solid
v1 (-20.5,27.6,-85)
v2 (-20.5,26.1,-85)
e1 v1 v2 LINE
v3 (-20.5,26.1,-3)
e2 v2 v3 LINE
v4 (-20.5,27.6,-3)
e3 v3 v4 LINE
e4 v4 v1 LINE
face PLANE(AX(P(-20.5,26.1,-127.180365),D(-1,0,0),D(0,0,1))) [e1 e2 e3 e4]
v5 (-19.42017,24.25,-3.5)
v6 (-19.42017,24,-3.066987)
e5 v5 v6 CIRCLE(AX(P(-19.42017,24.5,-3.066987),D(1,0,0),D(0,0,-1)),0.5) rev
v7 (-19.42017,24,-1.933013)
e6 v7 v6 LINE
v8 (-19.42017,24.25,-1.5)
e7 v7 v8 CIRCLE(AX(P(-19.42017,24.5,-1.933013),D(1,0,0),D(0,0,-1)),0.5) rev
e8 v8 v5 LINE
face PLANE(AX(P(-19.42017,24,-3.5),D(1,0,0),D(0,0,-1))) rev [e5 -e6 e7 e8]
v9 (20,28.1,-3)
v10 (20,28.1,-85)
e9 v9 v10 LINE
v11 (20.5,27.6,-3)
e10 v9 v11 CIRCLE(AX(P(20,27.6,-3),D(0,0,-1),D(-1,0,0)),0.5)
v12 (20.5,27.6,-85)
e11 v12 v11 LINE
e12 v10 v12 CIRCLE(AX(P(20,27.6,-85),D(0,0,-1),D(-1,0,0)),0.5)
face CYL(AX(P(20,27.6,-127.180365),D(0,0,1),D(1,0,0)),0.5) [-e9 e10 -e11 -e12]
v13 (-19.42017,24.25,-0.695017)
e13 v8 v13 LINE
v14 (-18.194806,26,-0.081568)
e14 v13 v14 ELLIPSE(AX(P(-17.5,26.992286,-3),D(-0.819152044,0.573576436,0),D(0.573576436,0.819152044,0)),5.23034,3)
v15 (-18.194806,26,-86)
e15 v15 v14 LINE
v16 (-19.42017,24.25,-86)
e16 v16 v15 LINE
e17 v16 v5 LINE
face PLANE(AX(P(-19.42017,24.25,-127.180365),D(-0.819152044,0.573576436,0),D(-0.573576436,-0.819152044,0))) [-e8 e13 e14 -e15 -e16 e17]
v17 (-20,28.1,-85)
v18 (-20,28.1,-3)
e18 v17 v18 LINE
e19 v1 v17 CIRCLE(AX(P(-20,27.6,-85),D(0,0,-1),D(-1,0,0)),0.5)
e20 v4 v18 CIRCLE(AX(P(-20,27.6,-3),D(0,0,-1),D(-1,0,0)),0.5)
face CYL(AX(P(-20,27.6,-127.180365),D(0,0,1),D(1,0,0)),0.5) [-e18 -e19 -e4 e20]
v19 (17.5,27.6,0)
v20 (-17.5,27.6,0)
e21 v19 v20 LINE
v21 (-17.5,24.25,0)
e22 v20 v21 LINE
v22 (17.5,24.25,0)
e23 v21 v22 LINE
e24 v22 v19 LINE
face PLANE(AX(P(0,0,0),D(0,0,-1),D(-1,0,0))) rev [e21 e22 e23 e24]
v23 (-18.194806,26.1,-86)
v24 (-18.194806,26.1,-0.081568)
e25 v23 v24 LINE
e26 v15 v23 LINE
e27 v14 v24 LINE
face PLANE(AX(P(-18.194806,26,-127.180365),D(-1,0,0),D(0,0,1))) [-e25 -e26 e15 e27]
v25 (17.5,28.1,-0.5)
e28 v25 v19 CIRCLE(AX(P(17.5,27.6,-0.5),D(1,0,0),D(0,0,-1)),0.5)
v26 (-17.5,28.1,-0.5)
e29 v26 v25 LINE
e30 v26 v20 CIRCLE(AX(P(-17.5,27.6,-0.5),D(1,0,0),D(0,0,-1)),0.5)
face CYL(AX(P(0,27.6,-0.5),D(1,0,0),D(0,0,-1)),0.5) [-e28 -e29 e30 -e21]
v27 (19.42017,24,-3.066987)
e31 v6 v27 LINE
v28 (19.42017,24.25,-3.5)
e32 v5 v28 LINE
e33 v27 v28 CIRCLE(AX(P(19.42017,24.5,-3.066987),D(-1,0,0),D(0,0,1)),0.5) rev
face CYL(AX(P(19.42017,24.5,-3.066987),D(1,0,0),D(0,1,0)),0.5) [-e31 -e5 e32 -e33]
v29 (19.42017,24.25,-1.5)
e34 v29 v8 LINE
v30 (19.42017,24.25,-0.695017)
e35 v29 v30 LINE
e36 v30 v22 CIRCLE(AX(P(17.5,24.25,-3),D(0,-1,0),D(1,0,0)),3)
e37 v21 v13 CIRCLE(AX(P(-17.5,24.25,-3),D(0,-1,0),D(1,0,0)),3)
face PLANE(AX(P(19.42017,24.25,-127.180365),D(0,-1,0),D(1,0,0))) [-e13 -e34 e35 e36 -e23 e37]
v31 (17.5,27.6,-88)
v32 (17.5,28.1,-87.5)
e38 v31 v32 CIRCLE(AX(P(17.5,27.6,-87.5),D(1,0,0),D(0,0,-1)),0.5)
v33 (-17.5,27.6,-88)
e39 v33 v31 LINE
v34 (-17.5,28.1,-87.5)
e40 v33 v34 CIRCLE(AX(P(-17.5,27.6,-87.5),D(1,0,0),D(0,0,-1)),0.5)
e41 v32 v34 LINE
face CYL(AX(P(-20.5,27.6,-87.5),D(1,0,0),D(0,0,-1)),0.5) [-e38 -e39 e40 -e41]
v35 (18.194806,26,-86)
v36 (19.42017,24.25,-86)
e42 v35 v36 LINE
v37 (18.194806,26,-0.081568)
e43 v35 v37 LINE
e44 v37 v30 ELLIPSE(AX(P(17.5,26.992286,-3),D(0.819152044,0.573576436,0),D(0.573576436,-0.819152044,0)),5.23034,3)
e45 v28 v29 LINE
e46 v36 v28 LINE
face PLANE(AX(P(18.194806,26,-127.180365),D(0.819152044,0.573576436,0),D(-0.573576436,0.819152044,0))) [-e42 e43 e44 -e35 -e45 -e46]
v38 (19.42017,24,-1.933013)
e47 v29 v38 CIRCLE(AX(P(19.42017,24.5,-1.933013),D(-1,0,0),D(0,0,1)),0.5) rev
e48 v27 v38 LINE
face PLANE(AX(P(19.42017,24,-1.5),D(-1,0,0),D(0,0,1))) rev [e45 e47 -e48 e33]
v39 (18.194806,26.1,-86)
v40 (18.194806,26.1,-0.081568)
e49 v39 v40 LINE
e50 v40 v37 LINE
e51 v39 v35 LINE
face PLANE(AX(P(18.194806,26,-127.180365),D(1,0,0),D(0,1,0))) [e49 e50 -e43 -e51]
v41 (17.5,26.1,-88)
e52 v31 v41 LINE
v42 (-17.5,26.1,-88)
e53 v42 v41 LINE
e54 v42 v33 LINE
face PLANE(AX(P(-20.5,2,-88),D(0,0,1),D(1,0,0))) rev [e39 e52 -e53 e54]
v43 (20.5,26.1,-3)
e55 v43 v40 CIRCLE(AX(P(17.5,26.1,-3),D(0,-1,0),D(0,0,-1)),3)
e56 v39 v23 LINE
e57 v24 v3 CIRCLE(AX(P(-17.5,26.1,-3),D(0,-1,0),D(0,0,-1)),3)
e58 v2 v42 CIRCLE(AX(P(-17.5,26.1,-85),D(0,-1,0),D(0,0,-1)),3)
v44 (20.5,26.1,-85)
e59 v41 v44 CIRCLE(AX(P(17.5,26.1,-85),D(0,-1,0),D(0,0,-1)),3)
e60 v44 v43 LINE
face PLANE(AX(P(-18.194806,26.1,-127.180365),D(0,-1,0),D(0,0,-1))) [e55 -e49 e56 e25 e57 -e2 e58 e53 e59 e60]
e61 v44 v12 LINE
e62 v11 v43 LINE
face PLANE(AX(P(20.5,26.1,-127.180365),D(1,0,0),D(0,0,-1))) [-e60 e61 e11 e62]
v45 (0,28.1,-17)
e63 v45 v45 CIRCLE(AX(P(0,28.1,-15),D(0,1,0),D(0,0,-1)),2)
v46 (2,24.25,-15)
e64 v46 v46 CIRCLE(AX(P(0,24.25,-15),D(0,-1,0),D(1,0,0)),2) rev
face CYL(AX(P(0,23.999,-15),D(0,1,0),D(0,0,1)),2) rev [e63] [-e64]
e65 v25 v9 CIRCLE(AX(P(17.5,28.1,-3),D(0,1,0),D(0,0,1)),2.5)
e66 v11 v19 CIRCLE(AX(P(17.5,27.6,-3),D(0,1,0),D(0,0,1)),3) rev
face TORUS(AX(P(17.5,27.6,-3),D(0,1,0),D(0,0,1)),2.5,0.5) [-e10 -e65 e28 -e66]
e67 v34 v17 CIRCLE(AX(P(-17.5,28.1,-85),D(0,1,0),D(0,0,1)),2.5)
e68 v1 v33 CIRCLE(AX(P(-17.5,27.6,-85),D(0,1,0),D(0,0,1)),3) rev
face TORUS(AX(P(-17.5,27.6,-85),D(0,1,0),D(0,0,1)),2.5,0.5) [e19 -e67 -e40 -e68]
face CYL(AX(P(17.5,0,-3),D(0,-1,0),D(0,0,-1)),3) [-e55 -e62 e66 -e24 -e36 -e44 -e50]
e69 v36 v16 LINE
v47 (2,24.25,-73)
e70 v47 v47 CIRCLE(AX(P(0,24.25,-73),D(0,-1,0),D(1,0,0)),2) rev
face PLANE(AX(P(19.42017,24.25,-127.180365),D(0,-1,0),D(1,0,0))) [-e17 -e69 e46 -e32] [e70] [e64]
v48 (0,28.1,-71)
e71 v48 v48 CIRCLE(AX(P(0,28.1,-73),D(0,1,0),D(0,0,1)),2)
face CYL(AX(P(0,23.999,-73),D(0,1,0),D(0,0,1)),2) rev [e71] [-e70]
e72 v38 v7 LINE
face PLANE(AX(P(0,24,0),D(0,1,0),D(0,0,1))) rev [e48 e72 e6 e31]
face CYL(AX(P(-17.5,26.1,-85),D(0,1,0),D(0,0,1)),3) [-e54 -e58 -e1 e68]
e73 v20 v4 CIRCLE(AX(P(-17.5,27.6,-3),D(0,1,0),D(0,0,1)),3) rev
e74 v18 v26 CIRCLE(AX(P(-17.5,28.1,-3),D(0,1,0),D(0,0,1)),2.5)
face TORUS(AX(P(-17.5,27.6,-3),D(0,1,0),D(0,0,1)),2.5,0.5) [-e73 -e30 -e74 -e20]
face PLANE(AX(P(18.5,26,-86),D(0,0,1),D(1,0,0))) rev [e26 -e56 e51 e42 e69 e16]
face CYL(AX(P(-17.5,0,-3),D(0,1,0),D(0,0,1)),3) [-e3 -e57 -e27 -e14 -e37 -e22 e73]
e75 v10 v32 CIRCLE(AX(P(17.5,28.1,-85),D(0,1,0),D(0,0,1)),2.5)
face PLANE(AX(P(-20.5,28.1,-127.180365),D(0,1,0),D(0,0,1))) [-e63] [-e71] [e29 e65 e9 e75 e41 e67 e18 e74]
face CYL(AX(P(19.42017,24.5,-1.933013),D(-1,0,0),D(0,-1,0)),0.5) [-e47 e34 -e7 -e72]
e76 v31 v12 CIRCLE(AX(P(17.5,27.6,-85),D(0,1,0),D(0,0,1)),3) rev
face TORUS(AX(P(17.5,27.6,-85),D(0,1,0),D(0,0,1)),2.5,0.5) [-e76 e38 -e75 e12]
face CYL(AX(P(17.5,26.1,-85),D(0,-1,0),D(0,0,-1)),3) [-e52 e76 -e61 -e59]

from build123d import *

# Parameters (mm, degrees)
BOSS_EXTRUDE1_DEPTH = 86
SKETCH2_W           = 41
SKETCH2_H           = 2
BOSS_EXTRUDE2_DEPTH = 2
SKETCH3_W           = 38.84033909
SKETCH3_H           = 2
BOSS_EXTRUDE3_DEPTH = 0.25
FILLET2_R           = 0.5
FILLET1_R           = 3
CUT_EXTRUDE1_REACH  = 92.449
SKETCH4_R           = 2
FILLET3_R           = 0.5


with BuildPart() as part:
    # Sketch1 → Boss-Extrude1 (new body)
    with BuildSketch(Plane.XY):
        Polygon((18.194806353, 26), (19.420169545, 24.25), (-19.420169545, 24.25), (-18.194806353, 26), (-18.194806353, 26.1), (-20.5, 26.1), (-20.5, 28.1), (20.5, 28.1), (20.5, 26.1), (18.194806353, 26.1), align=None)
    extrude(amount=-BOSS_EXTRUDE1_DEPTH)

    # Sketch2 → Boss-Extrude2 (add)
    with BuildSketch(Plane(origin=(0, 0, -86), x_dir=(-1, 0, 0), z_dir=(0, 0, -1))):
        with Locations((0, 27.1)):
            Rectangle(SKETCH2_W, SKETCH2_H)
    extrude(amount=BOSS_EXTRUDE2_DEPTH)

    # Sketch3 → Boss-Extrude3 (add)
    with BuildSketch(Plane.XZ.offset(-24.25)):
        with Locations((0, -2.5)):
            Rectangle(SKETCH3_W, SKETCH3_H)
    extrude(amount=BOSS_EXTRUDE3_DEPTH)

    # Fillet2
    # the kernel refuses this fillet: 0.5 mm, written as the material it takes off along each edge
    with BuildSketch(Plane(origin=(-20.502701299, 24, -3.5), x_dir=(0, 1, 0), z_dir=(1, 0, 0)), Plane(origin=(20.502701299, 24, -1.5), x_dir=(0, 1, 0), z_dir=(-1, 0, 0))) as fillet2_piece_1:
        with BuildLine():
            CenterArc((0.5, 0.433012702), FILLET2_R, 180, 60)
            Line((0, 0.433012702), (-0.01, 0.433012702))
            Line((-0.01, 0.433012702), (-0.01, 0))
            Line((-0.01, 0), (0, -0.01))
            ThreePointArc((0, -0.01), (0.125, -0.01), (0.245, -0.008660254))
            Line((0.245, -0.008660254), (0.25, 0))
        make_face()
    extrude(amount=41.005402599, mode=Mode.SUBTRACT)

    # Fillet1
    fillet1_edges = [part.edges().sort_by_distance(p)[0] for p in [
        (-20.5, 27.1, 0),
        (20.5, 27.1, 0),
        (-20.5, 27.1, -88),
        (20.5, 27.1, -88),
    ]]
    fillet(fillet1_edges, radius=FILLET1_R)

    # Sketch4 → Cut-Extrude1 (cut, up to next)
    with BuildSketch(Plane(origin=(0, 28.1, 0), x_dir=(1, 0, 0), z_dir=(0, 1, 0)), mode=Mode.PRIVATE) as cut_extrude1_sk1:
        with Locations(Location((0, 73, 0), (0, 0, 270))):
            Circle(SKETCH4_R)
    cut_extrude1_tool1 = extrude(cut_extrude1_sk1.sketch, amount=-CUT_EXTRUDE1_REACH, mode=Mode.PRIVATE) & part.part
    # Sketch4 → Cut-Extrude1 (cut, up to next)
    with BuildSketch(Plane(origin=(0, 28.1, 0), x_dir=(1, 0, 0), z_dir=(0, 1, 0)), mode=Mode.PRIVATE) as cut_extrude1_sk2:
        with Locations((0, 15)):
            Circle(SKETCH4_R)
    cut_extrude1_tool2 = extrude(cut_extrude1_sk2.sketch, amount=-CUT_EXTRUDE1_REACH, mode=Mode.PRIVATE) & part.part
    add(cut_extrude1_tool1.solids().sort_by_distance((0, 28.1, -73))[0], mode=Mode.SUBTRACT)
    add(cut_extrude1_tool2.solids().sort_by_distance((0, 28.1, -15))[0], mode=Mode.SUBTRACT)

    # Fillet3
    fillet3_edges = [part.edges().sort_by_distance(p)[0] for p in [
        (20.5, 28.1, -44),
        (0, 28.1, 0),
        (19.621320344, 28.1, -0.878679656),
        (-19.621320344, 28.1, -0.878679656),
        (19.621320344, 28.1, -87.121320344),
        (-19.621320344, 28.1, -87.121320344),
        (-20.5, 28.1, -44),
        (0, 28.1, -88),
    ]]
    fillet(fillet3_edges, radius=FILLET3_R)


solid = part.part
